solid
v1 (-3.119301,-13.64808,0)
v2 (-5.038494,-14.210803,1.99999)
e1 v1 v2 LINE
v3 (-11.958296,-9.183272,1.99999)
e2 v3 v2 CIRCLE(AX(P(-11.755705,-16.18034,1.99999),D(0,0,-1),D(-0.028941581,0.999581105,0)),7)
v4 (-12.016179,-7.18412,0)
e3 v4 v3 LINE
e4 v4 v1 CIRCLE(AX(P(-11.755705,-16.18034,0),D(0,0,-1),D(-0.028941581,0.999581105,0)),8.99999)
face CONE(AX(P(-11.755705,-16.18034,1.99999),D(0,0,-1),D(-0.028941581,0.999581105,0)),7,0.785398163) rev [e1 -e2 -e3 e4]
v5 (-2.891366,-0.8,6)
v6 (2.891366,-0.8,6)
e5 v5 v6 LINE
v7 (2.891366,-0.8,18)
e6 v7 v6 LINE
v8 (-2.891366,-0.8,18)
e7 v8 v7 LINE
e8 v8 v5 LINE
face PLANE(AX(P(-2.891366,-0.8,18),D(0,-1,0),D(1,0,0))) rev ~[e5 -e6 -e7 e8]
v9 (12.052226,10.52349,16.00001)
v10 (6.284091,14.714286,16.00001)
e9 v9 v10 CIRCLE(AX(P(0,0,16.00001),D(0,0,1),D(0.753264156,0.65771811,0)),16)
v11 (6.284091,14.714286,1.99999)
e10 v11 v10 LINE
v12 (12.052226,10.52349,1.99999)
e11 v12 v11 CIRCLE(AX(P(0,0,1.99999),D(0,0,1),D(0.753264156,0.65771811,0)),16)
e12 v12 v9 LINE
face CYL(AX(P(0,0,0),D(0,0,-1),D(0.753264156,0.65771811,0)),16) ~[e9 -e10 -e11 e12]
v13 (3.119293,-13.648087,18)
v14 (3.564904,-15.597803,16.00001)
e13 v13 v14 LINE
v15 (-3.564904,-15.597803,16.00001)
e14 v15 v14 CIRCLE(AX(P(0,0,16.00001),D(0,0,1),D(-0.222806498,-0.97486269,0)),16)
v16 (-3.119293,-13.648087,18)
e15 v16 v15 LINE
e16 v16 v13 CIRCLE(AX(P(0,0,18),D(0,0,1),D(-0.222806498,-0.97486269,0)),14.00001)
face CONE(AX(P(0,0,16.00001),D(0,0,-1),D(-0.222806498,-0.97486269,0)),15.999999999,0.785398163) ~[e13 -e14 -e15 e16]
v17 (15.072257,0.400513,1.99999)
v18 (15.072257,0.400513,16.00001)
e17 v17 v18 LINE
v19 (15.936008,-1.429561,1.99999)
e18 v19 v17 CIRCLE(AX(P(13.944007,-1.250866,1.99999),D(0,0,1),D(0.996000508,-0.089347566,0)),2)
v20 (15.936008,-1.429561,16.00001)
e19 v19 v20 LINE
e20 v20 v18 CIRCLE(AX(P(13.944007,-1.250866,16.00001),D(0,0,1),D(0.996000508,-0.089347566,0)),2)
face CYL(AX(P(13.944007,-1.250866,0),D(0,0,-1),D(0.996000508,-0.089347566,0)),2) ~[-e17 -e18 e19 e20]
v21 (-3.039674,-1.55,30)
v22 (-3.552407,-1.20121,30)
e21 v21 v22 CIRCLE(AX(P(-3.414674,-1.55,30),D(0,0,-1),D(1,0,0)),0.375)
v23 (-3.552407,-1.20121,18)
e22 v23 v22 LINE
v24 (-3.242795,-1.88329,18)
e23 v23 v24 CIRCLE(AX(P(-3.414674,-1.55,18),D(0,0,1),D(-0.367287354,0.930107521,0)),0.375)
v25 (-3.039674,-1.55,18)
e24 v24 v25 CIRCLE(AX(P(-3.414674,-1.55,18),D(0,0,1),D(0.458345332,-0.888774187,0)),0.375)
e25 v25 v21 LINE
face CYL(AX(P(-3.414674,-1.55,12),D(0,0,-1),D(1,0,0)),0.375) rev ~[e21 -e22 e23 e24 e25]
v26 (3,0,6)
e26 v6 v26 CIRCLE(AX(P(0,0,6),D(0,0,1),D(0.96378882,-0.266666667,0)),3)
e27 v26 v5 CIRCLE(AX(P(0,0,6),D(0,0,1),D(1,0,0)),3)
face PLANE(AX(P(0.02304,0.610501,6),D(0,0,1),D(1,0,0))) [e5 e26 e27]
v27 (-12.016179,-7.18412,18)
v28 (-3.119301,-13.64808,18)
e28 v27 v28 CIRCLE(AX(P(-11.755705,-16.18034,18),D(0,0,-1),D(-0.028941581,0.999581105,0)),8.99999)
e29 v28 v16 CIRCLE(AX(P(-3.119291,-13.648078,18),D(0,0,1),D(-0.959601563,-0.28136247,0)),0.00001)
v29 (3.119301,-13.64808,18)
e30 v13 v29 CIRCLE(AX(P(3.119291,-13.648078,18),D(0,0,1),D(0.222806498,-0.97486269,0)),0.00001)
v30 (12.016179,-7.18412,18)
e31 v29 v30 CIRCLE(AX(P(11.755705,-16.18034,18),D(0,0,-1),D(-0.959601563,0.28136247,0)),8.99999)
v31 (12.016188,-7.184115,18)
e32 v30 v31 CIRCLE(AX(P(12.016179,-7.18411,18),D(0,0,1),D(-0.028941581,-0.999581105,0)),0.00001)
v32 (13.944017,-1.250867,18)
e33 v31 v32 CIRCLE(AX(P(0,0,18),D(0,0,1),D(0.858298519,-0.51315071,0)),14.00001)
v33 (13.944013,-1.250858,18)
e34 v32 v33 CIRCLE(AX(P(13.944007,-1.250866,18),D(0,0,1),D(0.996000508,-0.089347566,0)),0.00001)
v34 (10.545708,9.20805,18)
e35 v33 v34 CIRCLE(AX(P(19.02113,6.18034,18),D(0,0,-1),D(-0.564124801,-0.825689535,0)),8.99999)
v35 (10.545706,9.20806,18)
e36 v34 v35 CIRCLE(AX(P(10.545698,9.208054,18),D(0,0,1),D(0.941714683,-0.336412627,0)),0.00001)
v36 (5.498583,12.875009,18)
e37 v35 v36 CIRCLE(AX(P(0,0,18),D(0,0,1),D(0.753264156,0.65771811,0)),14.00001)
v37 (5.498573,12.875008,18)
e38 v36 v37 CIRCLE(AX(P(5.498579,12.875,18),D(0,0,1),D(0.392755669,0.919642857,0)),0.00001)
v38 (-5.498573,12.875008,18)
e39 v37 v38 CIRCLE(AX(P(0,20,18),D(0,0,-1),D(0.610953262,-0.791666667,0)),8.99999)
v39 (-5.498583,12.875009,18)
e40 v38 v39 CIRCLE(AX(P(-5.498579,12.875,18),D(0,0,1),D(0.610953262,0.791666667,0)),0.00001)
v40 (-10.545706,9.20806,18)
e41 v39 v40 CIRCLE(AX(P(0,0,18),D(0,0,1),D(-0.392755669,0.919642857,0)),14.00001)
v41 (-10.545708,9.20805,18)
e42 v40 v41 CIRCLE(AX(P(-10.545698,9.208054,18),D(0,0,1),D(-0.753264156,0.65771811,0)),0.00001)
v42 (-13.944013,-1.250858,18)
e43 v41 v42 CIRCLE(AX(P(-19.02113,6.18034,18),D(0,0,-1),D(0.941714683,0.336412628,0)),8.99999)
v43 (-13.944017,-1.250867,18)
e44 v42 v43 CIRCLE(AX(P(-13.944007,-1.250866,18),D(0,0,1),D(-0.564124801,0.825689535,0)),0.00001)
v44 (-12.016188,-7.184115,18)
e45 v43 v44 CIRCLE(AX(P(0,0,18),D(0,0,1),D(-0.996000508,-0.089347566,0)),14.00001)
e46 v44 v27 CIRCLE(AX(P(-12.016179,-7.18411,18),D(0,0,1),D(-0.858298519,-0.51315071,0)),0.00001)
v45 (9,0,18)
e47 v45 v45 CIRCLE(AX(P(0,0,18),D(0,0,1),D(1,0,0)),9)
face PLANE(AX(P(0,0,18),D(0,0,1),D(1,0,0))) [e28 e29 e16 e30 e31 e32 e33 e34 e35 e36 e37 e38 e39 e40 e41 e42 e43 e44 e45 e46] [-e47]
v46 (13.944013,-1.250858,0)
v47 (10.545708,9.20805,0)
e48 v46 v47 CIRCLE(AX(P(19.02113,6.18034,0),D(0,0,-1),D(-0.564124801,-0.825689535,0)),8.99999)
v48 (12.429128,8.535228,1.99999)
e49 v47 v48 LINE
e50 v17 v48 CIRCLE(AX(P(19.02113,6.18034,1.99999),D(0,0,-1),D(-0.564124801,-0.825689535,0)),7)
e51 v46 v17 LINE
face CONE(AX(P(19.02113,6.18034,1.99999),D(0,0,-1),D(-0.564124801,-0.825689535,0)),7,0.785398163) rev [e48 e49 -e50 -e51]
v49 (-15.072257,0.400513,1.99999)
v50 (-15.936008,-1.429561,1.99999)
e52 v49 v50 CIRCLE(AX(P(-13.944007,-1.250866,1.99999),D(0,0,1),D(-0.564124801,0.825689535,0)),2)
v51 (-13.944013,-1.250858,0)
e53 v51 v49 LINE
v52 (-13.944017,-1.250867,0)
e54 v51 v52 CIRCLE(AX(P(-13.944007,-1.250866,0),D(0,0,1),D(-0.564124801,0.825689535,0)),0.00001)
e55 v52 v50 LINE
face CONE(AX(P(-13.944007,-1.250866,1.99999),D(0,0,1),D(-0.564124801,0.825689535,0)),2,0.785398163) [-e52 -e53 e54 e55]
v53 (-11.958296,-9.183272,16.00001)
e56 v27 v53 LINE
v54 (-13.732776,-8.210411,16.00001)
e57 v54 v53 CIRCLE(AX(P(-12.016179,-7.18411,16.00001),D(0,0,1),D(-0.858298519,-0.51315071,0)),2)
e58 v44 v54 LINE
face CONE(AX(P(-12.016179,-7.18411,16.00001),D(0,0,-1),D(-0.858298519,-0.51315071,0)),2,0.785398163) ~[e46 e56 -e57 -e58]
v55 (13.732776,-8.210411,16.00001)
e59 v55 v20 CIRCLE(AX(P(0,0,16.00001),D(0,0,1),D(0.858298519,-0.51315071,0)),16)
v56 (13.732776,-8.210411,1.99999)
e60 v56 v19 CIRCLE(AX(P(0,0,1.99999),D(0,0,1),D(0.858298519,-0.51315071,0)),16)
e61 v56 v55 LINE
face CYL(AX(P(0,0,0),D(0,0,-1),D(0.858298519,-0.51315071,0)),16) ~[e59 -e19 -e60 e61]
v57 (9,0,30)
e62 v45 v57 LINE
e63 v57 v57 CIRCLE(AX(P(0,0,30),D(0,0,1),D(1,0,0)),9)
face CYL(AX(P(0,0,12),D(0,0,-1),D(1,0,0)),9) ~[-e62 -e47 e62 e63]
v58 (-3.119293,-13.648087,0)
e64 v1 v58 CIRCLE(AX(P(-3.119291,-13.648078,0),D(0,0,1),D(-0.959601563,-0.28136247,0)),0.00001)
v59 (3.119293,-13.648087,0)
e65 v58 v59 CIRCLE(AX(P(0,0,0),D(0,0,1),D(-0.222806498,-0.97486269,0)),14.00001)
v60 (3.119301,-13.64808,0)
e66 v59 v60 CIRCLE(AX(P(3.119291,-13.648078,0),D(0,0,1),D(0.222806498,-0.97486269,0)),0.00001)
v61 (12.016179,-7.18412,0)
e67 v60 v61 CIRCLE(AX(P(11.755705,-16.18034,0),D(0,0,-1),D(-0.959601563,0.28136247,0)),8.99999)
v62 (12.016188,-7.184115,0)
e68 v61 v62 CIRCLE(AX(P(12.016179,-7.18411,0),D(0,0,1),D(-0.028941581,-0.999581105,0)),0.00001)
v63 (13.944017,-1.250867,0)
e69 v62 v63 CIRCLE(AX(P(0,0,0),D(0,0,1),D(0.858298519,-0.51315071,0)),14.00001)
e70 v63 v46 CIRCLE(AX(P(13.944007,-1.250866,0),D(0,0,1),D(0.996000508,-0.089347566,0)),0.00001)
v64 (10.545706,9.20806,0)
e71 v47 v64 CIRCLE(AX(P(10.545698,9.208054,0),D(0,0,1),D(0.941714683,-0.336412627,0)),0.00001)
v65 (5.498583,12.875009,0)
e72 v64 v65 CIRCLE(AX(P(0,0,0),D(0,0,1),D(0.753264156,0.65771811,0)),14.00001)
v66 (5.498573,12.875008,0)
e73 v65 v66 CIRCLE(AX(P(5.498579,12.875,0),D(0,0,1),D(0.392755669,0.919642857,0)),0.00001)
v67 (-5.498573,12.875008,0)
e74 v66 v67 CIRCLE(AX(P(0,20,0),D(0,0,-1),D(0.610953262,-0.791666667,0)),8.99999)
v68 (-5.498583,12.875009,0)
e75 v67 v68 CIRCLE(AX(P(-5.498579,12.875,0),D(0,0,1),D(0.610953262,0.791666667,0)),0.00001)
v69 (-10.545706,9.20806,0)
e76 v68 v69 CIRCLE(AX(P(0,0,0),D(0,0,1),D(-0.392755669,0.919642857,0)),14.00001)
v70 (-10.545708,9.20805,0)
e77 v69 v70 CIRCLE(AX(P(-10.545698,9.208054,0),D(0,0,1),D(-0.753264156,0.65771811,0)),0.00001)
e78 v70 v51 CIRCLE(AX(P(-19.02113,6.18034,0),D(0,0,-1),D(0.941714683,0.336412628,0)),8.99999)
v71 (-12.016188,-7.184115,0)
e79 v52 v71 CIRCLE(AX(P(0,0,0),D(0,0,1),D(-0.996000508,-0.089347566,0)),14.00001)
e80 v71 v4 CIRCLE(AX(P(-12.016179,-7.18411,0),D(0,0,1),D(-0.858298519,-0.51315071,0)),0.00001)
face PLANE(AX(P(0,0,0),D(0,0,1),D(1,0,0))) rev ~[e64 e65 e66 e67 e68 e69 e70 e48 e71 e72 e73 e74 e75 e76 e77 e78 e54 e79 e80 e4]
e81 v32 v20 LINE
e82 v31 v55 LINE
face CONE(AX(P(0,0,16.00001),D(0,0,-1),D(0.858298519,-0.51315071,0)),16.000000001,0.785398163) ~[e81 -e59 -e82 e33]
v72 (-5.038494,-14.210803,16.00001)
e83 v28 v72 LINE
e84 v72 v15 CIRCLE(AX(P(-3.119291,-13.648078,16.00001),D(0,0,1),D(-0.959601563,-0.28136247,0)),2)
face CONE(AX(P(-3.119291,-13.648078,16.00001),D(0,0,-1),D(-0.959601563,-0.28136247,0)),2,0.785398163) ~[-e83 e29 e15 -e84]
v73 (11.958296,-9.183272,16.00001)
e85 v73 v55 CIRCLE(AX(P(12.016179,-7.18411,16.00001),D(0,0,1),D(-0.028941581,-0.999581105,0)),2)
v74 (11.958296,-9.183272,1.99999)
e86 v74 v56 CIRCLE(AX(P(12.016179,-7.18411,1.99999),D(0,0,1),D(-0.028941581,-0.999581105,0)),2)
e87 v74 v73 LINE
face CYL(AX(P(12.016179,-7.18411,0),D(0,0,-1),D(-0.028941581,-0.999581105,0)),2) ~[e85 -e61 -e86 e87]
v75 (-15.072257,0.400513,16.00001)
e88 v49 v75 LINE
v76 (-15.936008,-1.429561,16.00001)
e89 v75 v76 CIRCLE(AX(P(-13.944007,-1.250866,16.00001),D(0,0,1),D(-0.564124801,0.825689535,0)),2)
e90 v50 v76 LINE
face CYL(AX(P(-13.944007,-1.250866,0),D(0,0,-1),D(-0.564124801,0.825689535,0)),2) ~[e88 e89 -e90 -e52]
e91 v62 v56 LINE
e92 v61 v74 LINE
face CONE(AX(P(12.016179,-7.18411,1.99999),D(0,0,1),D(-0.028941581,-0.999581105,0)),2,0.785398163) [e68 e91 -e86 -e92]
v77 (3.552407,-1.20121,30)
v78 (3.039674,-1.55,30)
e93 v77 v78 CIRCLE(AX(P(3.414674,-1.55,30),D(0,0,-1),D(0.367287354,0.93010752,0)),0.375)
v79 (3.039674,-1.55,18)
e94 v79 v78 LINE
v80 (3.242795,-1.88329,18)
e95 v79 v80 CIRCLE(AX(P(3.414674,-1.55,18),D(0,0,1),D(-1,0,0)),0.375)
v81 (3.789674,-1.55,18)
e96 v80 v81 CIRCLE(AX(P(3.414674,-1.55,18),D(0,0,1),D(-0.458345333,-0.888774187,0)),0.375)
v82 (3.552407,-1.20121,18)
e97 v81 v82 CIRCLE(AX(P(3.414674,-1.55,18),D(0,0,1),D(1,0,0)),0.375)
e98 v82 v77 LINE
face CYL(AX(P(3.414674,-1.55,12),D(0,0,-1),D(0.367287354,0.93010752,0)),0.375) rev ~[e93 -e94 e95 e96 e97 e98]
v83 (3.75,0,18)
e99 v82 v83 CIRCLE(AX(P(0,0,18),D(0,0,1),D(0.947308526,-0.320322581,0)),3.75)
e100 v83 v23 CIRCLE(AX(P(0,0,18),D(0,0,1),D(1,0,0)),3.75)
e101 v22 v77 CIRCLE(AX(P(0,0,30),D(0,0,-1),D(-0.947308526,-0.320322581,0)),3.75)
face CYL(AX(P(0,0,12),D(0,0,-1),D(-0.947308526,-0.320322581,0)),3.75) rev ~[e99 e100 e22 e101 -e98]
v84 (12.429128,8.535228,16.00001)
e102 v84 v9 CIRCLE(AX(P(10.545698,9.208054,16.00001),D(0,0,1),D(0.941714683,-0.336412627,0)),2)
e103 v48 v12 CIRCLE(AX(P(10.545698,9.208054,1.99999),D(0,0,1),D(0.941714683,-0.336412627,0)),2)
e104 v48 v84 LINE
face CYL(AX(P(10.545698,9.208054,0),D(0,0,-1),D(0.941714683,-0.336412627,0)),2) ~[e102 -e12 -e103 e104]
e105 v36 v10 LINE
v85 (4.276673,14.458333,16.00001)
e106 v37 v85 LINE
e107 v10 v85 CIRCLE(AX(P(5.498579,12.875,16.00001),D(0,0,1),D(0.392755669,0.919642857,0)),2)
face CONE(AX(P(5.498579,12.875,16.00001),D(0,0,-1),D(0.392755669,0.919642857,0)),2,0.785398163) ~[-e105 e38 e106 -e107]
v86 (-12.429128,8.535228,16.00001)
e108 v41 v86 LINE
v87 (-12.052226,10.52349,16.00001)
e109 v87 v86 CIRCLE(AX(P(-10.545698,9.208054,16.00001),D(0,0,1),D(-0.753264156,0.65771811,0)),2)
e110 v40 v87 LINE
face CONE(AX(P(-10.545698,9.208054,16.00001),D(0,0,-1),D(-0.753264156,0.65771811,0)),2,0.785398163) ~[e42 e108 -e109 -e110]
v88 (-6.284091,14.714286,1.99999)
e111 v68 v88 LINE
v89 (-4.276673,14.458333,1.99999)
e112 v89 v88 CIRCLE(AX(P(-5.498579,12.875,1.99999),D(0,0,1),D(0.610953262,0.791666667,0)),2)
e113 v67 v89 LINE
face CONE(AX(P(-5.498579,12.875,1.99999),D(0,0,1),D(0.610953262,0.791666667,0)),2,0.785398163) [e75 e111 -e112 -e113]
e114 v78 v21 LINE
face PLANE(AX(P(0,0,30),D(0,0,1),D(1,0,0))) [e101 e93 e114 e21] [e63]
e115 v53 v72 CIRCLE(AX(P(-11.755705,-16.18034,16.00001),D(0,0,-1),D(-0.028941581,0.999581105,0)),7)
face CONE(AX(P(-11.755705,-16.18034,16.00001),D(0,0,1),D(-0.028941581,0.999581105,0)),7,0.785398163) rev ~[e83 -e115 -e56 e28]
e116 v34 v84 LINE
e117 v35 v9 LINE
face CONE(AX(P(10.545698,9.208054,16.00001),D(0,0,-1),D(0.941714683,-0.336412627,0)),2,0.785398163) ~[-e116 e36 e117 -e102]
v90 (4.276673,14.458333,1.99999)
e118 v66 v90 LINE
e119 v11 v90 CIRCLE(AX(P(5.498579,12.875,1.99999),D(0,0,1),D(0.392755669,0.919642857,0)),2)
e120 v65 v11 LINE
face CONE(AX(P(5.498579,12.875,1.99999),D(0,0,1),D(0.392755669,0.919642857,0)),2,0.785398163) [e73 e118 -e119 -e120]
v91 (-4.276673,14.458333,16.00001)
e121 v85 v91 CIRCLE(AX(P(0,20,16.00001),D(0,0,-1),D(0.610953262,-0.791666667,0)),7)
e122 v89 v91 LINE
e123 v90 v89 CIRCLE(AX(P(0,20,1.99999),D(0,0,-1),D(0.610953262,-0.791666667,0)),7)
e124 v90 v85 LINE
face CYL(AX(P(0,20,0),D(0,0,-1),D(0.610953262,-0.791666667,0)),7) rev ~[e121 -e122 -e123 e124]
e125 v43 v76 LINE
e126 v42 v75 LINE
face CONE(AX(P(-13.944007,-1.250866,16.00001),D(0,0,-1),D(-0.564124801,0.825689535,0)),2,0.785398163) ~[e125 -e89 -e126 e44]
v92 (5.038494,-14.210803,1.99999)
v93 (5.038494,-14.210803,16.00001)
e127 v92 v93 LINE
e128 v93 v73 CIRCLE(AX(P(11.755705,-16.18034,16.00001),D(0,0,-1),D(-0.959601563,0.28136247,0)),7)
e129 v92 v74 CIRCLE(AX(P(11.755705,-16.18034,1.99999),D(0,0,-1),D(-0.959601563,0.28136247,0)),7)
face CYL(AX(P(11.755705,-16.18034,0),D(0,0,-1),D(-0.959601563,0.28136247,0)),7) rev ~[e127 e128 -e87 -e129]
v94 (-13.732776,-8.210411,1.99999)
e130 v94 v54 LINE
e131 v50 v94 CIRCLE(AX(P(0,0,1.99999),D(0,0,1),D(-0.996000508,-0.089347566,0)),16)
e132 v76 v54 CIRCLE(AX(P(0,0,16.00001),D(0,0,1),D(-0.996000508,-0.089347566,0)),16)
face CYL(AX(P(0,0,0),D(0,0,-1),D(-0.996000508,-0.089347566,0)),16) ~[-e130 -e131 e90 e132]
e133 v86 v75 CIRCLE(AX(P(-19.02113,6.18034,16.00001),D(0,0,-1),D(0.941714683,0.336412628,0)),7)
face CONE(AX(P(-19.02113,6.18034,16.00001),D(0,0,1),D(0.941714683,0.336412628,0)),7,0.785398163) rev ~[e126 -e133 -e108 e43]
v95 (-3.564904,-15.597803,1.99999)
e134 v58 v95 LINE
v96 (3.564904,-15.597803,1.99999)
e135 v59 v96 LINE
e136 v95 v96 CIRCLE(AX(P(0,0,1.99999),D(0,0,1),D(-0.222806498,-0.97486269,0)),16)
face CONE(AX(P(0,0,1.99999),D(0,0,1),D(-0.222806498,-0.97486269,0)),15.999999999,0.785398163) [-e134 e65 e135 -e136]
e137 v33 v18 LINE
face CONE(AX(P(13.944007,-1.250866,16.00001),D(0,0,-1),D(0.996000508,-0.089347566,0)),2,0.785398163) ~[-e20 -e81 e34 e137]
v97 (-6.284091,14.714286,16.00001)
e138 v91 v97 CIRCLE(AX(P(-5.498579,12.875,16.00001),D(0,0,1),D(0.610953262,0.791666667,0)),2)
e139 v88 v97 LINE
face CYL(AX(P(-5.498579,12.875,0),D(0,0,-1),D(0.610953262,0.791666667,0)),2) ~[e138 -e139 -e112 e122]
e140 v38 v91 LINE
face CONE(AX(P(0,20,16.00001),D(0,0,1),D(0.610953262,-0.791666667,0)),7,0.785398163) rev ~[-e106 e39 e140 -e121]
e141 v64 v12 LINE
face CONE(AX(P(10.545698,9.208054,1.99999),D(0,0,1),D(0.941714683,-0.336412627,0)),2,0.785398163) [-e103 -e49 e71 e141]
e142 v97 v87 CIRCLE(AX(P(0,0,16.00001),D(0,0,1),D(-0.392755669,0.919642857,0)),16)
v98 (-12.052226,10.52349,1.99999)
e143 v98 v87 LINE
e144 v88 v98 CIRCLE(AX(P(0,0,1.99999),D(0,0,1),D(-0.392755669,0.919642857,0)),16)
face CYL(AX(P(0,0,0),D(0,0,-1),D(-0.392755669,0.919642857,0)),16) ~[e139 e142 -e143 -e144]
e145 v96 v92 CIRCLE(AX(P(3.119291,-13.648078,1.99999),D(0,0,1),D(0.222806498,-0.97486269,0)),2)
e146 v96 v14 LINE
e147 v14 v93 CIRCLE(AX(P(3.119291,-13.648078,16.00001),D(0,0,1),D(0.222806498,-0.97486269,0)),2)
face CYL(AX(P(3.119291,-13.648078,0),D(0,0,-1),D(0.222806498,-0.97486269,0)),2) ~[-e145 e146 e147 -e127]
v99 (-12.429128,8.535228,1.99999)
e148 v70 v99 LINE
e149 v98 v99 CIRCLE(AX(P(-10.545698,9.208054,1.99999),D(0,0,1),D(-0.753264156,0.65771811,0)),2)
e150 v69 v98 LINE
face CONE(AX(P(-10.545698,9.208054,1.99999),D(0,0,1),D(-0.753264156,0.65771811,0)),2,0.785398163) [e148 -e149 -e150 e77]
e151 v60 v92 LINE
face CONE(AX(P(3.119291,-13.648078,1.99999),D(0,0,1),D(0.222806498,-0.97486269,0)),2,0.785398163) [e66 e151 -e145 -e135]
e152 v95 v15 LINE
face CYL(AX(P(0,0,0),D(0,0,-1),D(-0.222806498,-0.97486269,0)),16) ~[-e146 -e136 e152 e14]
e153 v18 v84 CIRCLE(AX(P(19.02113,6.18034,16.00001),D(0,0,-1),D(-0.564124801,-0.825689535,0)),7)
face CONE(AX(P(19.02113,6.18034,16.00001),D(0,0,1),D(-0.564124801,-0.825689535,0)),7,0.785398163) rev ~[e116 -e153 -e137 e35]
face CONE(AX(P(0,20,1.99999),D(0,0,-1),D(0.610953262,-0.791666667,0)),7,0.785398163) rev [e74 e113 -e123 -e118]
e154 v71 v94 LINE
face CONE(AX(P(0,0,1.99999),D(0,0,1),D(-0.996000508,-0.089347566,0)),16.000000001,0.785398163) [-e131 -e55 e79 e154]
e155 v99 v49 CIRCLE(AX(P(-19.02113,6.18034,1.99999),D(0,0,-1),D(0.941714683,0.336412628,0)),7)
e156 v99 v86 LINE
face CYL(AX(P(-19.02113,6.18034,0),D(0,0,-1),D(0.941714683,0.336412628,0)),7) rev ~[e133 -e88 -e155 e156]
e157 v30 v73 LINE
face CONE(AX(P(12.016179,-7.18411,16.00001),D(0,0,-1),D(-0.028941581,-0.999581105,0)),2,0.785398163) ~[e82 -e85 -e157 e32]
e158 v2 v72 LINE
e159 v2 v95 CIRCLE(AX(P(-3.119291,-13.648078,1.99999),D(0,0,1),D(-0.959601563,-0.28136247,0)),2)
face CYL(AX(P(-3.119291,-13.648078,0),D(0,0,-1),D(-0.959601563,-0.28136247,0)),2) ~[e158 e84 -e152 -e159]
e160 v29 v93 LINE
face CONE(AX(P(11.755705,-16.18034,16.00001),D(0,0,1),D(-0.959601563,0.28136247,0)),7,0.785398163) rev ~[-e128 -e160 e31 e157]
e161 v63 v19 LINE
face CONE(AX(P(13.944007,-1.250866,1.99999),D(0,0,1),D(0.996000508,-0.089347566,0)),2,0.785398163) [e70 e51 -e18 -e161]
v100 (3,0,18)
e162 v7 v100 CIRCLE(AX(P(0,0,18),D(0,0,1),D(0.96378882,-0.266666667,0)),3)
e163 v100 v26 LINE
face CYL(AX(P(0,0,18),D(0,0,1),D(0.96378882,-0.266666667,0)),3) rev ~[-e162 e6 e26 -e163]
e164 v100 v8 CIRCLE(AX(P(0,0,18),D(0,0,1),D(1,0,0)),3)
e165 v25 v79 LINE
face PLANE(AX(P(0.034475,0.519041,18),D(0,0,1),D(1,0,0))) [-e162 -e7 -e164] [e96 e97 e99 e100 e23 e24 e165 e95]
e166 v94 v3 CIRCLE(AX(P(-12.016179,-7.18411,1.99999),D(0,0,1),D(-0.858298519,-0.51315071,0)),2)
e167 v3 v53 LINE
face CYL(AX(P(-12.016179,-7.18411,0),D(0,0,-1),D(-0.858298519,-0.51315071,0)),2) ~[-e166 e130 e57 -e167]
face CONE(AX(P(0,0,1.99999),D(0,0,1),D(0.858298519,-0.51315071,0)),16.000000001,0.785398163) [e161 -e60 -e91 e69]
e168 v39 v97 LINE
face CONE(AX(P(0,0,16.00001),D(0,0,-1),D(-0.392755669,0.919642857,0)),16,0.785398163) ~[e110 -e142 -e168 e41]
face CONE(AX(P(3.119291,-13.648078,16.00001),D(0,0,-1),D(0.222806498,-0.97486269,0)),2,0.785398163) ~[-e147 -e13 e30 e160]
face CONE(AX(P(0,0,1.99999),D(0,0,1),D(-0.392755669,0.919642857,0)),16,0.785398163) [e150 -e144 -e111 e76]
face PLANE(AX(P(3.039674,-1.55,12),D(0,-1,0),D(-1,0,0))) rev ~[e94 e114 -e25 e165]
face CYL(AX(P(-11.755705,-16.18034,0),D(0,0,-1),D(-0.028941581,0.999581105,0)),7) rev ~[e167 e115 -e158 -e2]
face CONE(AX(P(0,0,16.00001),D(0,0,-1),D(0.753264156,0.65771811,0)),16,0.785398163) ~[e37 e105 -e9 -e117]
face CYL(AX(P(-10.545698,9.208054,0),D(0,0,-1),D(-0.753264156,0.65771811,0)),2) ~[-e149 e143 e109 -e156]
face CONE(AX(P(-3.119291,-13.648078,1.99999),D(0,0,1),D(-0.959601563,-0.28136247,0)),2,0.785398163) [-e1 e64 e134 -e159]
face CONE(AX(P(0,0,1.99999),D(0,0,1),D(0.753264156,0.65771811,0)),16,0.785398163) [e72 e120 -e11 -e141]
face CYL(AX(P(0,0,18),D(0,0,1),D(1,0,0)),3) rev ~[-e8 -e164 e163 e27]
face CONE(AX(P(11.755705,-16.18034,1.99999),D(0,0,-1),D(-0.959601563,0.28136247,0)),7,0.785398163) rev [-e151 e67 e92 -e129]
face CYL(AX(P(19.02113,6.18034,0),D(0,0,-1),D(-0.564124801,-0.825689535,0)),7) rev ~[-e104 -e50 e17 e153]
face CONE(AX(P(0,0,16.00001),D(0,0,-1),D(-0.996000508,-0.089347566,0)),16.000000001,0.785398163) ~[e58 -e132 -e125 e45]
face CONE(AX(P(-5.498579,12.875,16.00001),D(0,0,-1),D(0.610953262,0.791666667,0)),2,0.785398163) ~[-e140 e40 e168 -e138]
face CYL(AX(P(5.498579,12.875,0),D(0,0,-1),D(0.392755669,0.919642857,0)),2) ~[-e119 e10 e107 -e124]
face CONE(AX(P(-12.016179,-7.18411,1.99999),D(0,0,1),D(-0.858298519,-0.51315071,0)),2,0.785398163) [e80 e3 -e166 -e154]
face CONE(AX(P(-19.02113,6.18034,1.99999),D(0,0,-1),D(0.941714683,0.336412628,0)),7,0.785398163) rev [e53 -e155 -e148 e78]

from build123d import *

# Parameters (mm, degrees)
F1_R      = 9
F2_DEPTH  = 12
F2_FACE_R = 9
F3_DEPTH  = 18
F5_DEPTH  = 12
F6_SIZE   = 1.99999


# Not quite as in the source:
# - a fillet or chamfer is up to 0.001 mm smaller than in the source, because OpenCascade refuses the exact size


with BuildPart() as f2:
    # F1 (on Top) → F2 (new body)
    with BuildSketch(Plane.XY):
        Circle(F1_R)
        with BuildLine():
            ThreePointArc((-3.5524069735, -1.2012096798), (-0.6086763711, 3.7002720272), (3.75, 0))
            ThreePointArc((3.75, 0), (3.7002720272, -0.6086763711), (3.5524069735, -1.2012096798))
            ThreePointArc((3.5524069735, -1.2012096798), (3.7247345197, -1.339079143), (3.7896742158, -1.55))
            ThreePointArc((3.7896742158, -1.55), (3.6098282416, -1.8702185288), (3.242794716, -1.8832903202))
            ThreePointArc((3.242794716, -1.8832903202), (0, -3.75), (-3.242794716, -1.8832903202))
            ThreePointArc((-3.242794716, -1.8832903202), (-3.7561416374, -1.705), (-3.5524069735, -1.2012096798))
        make_face(mode=Mode.SUBTRACT)
        with BuildLine():
            Line((3.0396742158, -1.55), (-3.0396742158, -1.55))
            ThreePointArc((-3.0396742158, -1.55), (-3.0944556869, -1.7451540258), (-3.242794716, -1.8832903202))
            ThreePointArc((-3.242794716, -1.8832903202), (0, -3.75), (3.242794716, -1.8832903202))
            ThreePointArc((3.242794716, -1.8832903202), (3.0944556869, -1.7451540258), (3.0396742158, -1.55))
        make_face()
    extrude(amount=F2_DEPTH)

    # F1 (on Top) + F2_face (on face) → F3 (join)
    with BuildSketch(Plane.XY):
        with BuildLine():
            ThreePointArc((-4.2766728371, 14.4583333333), (-5.2456206791, 14.8589384831), (-6.2840906994, 14.7142857143))
            ThreePointArc((-6.2840906994, 14.7142857143), (-9.4045640367, 12.94427191), (-12.0522264909, 10.5234897545))
            ThreePointArc((-12.0522264909, 10.5234897545), (-12.5107043337, 9.5805462385), (-12.4291275454, 8.5352282801))
            ThreePointArc((-12.4291275454, 8.5352282801), (-12.3637347118, 4.0172209269), (-15.0722567175, 0.4005131406))
            ThreePointArc((-15.0722567175, 0.4005131406), (-15.7526762055, -0.3972172192), (-15.9360081315, -1.4295610629))
            ThreePointArc((-15.9360081315, -1.4295610629), (-15.2169042607, -4.94427191), (-13.7327763109, -8.2104113658))
            ThreePointArc((-13.7327763109, -8.2104113658), (-12.9776611805, -8.9378352769), (-11.9582961107, -9.1832721545))
            ThreePointArc((-11.9582961107, -9.1832721545), (-7.6412082798, -10.5172209269), (-5.0384941015, -14.2108025995))
            ThreePointArc((-5.0384941015, -14.2108025995), (-4.4900686296, -15.1044322255), (-3.5649039709, -15.5978030401))
            ThreePointArc((-3.5649039709, -15.5978030401), (0, -16), (3.5649039709, -15.5978030401))
            ThreePointArc((3.5649039709, -15.5978030401), (4.4900686296, -15.1044322255), (5.0384941015, -14.2108025995))
            ThreePointArc((5.0384941015, -14.2108025995), (7.6412082798, -10.5172209269), (11.9582961107, -9.1832721545))
            ThreePointArc((11.9582961107, -9.1832721545), (12.9776611805, -8.9378352769), (13.7327763109, -8.2104113658))
            ThreePointArc((13.7327763109, -8.2104113658), (15.2169042607, -4.94427191), (15.9360081315, -1.4295610629))
            ThreePointArc((15.9360081315, -1.4295610629), (15.7526762055, -0.3972172192), (15.0722567175, 0.4005131406))
            ThreePointArc((15.0722567175, 0.4005131406), (12.3637347118, 4.0172209269), (12.4291275454, 8.5352282801))
            ThreePointArc((12.4291275454, 8.5352282801), (12.5107043337, 9.5805462385), (12.0522264909, 10.5234897545))
            ThreePointArc((12.0522264909, 10.5234897545), (9.4045640367, 12.94427191), (6.2840906994, 14.7142857143))
            ThreePointArc((6.2840906994, 14.7142857143), (5.2456206791, 14.8589384831), (4.2766728371, 14.4583333333))
            ThreePointArc((4.2766728371, 14.4583333333), (0, 13), (-4.2766728371, 14.4583333333))
        make_face()
        Circle(F1_R, mode=Mode.SUBTRACT)
        with BuildLine():
            ThreePointArc((3.5524069735, -1.2012096798), (3.7002720272, -0.6086763711), (3.75, 0))
            ThreePointArc((3.75, 0), (-0.6086763711, 3.7002720272), (-3.5524069735, -1.2012096798))
            ThreePointArc((-3.5524069735, -1.2012096798), (-3.2037533587, -1.2399396961), (-3.0396742158, -1.55))
            Line((-3.0396742158, -1.55), (3.0396742158, -1.55))
            ThreePointArc((3.0396742158, -1.55), (3.2037533587, -1.2399396961), (3.5524069735, -1.2012096798))
        make_face()
        with BuildLine():
            ThreePointArc((-3.4146742158, -1.55), (-3.487903202, -1.3773275768), (-3.5524069735, -1.2012096798))
            ThreePointArc((-3.5524069735, -1.2012096798), (-3.7561416374, -1.705), (-3.242794716, -1.8832903202))
            ThreePointArc((-3.242794716, -1.8832903202), (-3.332903202, -1.7187949983), (-3.4146742158, -1.55))
        make_face()
        with BuildLine():
            ThreePointArc((-3.0396742158, -1.55), (-3.2037533587, -1.2399396961), (-3.5524069735, -1.2012096798))
            ThreePointArc((-3.5524069735, -1.2012096798), (-3.487903202, -1.3773275768), (-3.4146742158, -1.55))
            Line((-3.4146742158, -1.55), (-3.0396742158, -1.55))
        make_face()
        with BuildLine():
            Line((-3.0396742158, -1.55), (-3.4146742158, -1.55))
            ThreePointArc((-3.4146742158, -1.55), (-3.332903202, -1.7187949983), (-3.242794716, -1.8832903202))
            ThreePointArc((-3.242794716, -1.8832903202), (-3.0944556869, -1.7451540258), (-3.0396742158, -1.55))
        make_face()
        with BuildLine():
            ThreePointArc((3.4146742158, -1.55), (3.487903202, -1.3773275768), (3.5524069735, -1.2012096798))
            ThreePointArc((3.5524069735, -1.2012096798), (3.2037533587, -1.2399396961), (3.0396742158, -1.55))
            Line((3.0396742158, -1.55), (3.4146742158, -1.55))
        make_face()
        with BuildLine():
            ThreePointArc((3.242794716, -1.8832903202), (3.332903202, -1.7187949983), (3.4146742158, -1.55))
            Line((3.4146742158, -1.55), (3.0396742158, -1.55))
            ThreePointArc((3.0396742158, -1.55), (3.0944556869, -1.7451540258), (3.242794716, -1.8832903202))
        make_face()
        with BuildLine():
            ThreePointArc((3.7896742158, -1.55), (3.7247345197, -1.339079143), (3.5524069735, -1.2012096798))
            ThreePointArc((3.5524069735, -1.2012096798), (3.487903202, -1.3773275768), (3.4146742158, -1.55))
            ThreePointArc((3.4146742158, -1.55), (3.332903202, -1.7187949983), (3.242794716, -1.8832903202))
            ThreePointArc((3.242794716, -1.8832903202), (3.6098282416, -1.8702185288), (3.7896742158, -1.55))
        make_face()
    with BuildSketch(Plane(origin=(0, -0.1158950357, 12), x_dir=(1, 0, 0), z_dir=(0, 0, 1))):
        with Locations((0, 0.1158950357)):
            Circle(F2_FACE_R)
        with BuildLine():
            ThreePointArc((-3.5524069735, -1.0853146441), (0, 3.8658950357), (3.5524069735, -1.0853146441))
            ThreePointArc((3.5524069735, -1.0853146441), (3.6255950728, -1.7441652682), (3.0396742158, -1.4341049643))
            Line((3.0396742158, -1.4341049643), (-3.0396742158, -1.4341049643))
            ThreePointArc((-3.0396742158, -1.4341049643), (-3.6255950728, -1.7441652682), (-3.5524069735, -1.0853146441))
        make_face(mode=Mode.SUBTRACT)
    extrude(amount=F3_DEPTH)

    # F4 (on face) → F5 (cut)
    with BuildSketch(Plane.XY.offset(18)):
        with BuildLine():
            ThreePointArc((2.891366459, -0.8), (2.9727175595, -0.4036710437), (3, 0))
            ThreePointArc((3, 0), (-0.4036710437, 2.9727175595), (-2.891366459, -0.8))
            Line((-2.891366459, -0.8), (2.891366459, -0.8))
        make_face()
    extrude(amount=-F5_DEPTH, mode=Mode.SUBTRACT)

    # F6 (size 2 in the source; OpenCascade refuses exactly that, so slightly less here)
    f6_edges = [f2.edges().sort_by_distance(p)[0] for p in [
        (0, -16, 18),
        (0, -16, 0),
    ]]
    chamfer(f6_edges, length=F6_SIZE)


solid = f2.part
